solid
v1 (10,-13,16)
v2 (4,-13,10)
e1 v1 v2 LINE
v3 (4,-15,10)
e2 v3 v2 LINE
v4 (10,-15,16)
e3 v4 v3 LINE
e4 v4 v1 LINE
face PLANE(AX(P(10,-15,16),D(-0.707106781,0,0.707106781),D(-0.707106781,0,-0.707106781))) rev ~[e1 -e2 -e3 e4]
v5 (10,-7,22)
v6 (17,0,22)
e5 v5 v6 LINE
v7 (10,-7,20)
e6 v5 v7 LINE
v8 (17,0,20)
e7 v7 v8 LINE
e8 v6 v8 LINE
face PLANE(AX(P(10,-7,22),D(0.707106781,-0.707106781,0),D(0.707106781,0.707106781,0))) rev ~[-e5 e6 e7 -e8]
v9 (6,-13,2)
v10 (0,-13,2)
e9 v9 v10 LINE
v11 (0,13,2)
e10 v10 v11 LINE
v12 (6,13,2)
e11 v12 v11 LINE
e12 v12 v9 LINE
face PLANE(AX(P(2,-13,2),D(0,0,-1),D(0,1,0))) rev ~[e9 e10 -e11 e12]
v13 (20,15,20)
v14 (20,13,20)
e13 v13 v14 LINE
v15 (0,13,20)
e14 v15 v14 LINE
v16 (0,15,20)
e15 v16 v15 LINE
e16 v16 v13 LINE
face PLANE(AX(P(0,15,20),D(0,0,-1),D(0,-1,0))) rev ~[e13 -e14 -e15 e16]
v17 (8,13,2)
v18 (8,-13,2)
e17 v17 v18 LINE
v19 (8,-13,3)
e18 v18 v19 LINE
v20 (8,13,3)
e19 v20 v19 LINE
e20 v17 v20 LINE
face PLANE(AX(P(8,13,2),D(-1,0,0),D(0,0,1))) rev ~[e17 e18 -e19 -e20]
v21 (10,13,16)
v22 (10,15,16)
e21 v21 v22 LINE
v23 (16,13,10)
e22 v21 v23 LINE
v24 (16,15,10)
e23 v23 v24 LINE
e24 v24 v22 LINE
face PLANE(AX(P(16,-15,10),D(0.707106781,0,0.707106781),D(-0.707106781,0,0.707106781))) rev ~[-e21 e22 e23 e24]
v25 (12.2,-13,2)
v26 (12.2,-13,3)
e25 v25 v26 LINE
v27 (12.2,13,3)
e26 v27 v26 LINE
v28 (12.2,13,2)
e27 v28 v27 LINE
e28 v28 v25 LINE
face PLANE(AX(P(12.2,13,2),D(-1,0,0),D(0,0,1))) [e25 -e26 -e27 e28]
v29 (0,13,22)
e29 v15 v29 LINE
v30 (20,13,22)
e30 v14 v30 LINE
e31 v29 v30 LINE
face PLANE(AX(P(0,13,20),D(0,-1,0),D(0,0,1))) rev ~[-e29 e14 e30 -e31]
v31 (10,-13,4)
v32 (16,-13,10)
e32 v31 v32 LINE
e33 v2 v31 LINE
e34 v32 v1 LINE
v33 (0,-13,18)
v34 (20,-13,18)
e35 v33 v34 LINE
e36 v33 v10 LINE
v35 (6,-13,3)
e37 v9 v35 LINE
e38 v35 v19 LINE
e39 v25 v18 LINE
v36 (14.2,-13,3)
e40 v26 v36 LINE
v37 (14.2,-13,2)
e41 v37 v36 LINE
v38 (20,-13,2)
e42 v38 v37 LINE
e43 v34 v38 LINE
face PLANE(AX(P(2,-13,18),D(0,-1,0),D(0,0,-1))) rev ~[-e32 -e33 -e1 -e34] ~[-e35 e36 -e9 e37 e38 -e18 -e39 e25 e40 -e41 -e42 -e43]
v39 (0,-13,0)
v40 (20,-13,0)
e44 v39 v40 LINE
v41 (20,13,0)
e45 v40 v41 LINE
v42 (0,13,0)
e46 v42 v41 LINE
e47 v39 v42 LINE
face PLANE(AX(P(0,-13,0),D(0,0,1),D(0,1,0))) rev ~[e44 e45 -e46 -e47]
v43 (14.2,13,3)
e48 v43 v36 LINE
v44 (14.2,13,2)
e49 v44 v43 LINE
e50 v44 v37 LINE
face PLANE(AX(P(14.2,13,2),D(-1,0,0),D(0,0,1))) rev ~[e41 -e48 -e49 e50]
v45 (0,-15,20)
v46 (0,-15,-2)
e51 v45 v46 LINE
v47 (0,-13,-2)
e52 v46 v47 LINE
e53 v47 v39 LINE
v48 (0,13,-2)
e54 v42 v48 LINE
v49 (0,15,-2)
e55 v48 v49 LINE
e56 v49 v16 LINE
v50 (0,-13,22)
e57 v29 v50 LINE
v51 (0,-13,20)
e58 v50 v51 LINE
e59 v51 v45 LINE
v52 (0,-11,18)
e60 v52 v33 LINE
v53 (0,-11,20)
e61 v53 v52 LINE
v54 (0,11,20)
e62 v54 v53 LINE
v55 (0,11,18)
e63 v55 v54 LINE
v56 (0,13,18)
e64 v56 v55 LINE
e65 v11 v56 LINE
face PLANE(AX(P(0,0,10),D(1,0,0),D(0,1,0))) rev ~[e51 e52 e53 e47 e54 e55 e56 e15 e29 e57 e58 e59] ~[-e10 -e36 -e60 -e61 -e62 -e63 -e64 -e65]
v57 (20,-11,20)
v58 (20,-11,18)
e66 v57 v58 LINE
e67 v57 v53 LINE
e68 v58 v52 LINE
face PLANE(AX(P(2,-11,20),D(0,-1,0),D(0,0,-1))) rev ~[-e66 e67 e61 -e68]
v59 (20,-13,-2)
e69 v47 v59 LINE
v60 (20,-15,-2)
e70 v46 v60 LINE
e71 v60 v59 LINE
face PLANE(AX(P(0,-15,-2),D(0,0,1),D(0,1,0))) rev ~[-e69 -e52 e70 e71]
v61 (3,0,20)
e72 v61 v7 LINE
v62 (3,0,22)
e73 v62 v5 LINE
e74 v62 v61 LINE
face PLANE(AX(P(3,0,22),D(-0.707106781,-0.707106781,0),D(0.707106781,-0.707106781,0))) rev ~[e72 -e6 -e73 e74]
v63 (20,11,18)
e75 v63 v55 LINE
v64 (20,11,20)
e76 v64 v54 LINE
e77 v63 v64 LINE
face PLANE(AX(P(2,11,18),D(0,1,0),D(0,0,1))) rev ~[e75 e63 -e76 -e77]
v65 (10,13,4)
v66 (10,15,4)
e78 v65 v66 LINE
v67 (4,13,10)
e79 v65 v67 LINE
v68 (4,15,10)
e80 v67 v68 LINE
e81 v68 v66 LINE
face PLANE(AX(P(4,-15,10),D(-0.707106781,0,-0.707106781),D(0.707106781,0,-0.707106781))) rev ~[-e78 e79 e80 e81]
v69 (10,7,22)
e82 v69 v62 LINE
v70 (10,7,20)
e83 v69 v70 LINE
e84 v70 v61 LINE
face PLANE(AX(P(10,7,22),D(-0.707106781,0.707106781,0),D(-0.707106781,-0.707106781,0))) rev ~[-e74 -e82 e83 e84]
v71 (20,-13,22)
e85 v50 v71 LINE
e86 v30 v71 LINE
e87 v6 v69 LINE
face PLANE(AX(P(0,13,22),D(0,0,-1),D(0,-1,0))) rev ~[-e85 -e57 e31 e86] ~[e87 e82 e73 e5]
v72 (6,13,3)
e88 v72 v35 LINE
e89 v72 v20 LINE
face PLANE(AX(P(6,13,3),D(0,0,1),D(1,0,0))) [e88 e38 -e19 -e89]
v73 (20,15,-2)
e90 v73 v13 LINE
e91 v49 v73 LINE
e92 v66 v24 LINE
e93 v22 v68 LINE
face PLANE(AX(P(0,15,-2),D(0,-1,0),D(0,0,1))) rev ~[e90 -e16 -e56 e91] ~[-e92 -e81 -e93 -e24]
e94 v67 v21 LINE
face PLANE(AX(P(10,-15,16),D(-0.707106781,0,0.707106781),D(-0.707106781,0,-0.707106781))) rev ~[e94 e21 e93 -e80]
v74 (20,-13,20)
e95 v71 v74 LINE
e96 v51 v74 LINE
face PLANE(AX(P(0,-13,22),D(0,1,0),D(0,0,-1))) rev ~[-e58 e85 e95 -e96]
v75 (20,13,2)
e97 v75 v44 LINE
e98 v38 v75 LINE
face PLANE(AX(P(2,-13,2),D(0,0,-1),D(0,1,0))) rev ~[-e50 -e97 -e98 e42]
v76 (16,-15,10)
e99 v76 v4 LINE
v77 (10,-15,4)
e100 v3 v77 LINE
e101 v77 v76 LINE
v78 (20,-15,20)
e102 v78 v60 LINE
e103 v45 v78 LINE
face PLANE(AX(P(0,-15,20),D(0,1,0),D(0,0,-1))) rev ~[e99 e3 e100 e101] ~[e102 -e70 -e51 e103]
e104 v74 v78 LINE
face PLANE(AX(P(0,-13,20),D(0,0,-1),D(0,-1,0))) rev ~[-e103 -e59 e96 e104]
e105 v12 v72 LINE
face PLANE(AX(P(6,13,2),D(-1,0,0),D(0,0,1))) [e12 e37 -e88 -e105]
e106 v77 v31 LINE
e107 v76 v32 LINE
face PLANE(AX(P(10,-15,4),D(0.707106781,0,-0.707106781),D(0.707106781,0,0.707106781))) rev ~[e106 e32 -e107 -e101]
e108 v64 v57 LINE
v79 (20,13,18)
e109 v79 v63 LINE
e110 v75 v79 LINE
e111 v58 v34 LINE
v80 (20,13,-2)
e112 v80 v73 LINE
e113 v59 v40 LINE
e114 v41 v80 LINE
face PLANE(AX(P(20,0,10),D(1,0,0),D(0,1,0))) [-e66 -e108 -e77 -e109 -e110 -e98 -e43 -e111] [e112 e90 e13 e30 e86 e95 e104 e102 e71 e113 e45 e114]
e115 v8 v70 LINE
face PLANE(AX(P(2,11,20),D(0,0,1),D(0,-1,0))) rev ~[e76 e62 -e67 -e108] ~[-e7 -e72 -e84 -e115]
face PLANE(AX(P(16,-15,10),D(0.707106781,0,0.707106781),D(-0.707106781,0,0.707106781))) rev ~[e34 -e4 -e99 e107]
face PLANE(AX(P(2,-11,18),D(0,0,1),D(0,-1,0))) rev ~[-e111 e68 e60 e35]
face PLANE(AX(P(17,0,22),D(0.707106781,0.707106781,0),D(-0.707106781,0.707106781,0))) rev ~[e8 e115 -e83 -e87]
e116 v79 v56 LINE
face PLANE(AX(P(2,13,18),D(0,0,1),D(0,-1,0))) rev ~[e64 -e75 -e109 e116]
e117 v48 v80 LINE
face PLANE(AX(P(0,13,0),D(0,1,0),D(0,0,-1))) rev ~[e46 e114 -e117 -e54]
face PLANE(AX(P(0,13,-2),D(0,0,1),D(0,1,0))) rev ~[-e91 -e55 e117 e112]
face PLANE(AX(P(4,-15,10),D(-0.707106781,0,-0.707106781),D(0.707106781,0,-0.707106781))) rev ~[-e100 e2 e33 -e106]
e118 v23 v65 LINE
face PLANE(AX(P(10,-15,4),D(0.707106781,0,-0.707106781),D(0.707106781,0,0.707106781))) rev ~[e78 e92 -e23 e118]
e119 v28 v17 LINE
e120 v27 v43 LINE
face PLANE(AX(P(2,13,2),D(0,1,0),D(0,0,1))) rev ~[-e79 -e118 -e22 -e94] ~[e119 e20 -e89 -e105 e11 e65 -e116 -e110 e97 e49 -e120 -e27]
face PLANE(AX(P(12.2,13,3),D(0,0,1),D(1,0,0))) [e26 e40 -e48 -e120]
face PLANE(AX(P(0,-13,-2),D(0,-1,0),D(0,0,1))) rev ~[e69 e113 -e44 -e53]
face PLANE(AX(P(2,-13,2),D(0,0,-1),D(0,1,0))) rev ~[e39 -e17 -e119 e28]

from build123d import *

# Parameters (mm, degrees)
F1_DEPTH = 20
F2_T     = -2
F3_W     = 2
F3_H     = 1
F4_DEPTH = 26
F6_DEPTH = 30.001
F8_DEPTH = 2


# Not quite as in the source:
# - a shell that OpenCascade refuses in one call is made with other operations: the cavity is built on its own and cut out


with BuildPart() as f1:
    # F0 (on Right) → F1 (new body)
    with BuildSketch(Plane.YZ):
        Polygon((-13, -2), (-13, 0), (13, 0), (13, -2), (15, -2), (15, 20), (13, 20), (13, 22), (-13, 22), (-13, 20), (-15, 20), (-15, -2), align=None)
    extrude(amount=F1_DEPTH)

    # F2: a shell. OpenCascade refuses it in one call, so the cavity is built on its own and cut out:
    # the body offset inwards by the wall thickness, plus a prism from it out through each open face.
    f2_core = offset(f1.part, amount=F2_T, kind=Kind.INTERSECTION, mode=Mode.PRIVATE)
    f2_exits = [f2_core.faces().sort_by_distance(p)[0] for p in [
        (2, 0, 10.86087),
        (18, 0, 10.86087),
    ]]
    add(f2_core, mode=Mode.SUBTRACT)
    extrude(f2_exits, amount=-F2_T, mode=Mode.SUBTRACT)

    # F3 (on face) → F4 (join, through all)
    with BuildSketch(Plane.XZ.offset(-13)):
        with Locations((7, 2.5)):
            Rectangle(F3_W, F3_H)
        with Locations((13.2, 2.5)):
            Rectangle(F3_W, F3_H)
    extrude(amount=F4_DEPTH)

    # F5 (on face) → F6 (cut, through all)
    with BuildSketch(Plane.XZ.offset(15)):
        Polygon((16, 10), (10, 16), (4, 10), (10, 4), align=None)
    extrude(amount=-F6_DEPTH, mode=Mode.SUBTRACT)

    # F7 (on face) → F8 (cut, through all)
    with BuildSketch(Plane.XY.offset(22)):
        Polygon((17, 0), (10, 7), (3, 0), (10, -7), align=None)
    extrude(amount=-F8_DEPTH, mode=Mode.SUBTRACT)


solid = f1.part
